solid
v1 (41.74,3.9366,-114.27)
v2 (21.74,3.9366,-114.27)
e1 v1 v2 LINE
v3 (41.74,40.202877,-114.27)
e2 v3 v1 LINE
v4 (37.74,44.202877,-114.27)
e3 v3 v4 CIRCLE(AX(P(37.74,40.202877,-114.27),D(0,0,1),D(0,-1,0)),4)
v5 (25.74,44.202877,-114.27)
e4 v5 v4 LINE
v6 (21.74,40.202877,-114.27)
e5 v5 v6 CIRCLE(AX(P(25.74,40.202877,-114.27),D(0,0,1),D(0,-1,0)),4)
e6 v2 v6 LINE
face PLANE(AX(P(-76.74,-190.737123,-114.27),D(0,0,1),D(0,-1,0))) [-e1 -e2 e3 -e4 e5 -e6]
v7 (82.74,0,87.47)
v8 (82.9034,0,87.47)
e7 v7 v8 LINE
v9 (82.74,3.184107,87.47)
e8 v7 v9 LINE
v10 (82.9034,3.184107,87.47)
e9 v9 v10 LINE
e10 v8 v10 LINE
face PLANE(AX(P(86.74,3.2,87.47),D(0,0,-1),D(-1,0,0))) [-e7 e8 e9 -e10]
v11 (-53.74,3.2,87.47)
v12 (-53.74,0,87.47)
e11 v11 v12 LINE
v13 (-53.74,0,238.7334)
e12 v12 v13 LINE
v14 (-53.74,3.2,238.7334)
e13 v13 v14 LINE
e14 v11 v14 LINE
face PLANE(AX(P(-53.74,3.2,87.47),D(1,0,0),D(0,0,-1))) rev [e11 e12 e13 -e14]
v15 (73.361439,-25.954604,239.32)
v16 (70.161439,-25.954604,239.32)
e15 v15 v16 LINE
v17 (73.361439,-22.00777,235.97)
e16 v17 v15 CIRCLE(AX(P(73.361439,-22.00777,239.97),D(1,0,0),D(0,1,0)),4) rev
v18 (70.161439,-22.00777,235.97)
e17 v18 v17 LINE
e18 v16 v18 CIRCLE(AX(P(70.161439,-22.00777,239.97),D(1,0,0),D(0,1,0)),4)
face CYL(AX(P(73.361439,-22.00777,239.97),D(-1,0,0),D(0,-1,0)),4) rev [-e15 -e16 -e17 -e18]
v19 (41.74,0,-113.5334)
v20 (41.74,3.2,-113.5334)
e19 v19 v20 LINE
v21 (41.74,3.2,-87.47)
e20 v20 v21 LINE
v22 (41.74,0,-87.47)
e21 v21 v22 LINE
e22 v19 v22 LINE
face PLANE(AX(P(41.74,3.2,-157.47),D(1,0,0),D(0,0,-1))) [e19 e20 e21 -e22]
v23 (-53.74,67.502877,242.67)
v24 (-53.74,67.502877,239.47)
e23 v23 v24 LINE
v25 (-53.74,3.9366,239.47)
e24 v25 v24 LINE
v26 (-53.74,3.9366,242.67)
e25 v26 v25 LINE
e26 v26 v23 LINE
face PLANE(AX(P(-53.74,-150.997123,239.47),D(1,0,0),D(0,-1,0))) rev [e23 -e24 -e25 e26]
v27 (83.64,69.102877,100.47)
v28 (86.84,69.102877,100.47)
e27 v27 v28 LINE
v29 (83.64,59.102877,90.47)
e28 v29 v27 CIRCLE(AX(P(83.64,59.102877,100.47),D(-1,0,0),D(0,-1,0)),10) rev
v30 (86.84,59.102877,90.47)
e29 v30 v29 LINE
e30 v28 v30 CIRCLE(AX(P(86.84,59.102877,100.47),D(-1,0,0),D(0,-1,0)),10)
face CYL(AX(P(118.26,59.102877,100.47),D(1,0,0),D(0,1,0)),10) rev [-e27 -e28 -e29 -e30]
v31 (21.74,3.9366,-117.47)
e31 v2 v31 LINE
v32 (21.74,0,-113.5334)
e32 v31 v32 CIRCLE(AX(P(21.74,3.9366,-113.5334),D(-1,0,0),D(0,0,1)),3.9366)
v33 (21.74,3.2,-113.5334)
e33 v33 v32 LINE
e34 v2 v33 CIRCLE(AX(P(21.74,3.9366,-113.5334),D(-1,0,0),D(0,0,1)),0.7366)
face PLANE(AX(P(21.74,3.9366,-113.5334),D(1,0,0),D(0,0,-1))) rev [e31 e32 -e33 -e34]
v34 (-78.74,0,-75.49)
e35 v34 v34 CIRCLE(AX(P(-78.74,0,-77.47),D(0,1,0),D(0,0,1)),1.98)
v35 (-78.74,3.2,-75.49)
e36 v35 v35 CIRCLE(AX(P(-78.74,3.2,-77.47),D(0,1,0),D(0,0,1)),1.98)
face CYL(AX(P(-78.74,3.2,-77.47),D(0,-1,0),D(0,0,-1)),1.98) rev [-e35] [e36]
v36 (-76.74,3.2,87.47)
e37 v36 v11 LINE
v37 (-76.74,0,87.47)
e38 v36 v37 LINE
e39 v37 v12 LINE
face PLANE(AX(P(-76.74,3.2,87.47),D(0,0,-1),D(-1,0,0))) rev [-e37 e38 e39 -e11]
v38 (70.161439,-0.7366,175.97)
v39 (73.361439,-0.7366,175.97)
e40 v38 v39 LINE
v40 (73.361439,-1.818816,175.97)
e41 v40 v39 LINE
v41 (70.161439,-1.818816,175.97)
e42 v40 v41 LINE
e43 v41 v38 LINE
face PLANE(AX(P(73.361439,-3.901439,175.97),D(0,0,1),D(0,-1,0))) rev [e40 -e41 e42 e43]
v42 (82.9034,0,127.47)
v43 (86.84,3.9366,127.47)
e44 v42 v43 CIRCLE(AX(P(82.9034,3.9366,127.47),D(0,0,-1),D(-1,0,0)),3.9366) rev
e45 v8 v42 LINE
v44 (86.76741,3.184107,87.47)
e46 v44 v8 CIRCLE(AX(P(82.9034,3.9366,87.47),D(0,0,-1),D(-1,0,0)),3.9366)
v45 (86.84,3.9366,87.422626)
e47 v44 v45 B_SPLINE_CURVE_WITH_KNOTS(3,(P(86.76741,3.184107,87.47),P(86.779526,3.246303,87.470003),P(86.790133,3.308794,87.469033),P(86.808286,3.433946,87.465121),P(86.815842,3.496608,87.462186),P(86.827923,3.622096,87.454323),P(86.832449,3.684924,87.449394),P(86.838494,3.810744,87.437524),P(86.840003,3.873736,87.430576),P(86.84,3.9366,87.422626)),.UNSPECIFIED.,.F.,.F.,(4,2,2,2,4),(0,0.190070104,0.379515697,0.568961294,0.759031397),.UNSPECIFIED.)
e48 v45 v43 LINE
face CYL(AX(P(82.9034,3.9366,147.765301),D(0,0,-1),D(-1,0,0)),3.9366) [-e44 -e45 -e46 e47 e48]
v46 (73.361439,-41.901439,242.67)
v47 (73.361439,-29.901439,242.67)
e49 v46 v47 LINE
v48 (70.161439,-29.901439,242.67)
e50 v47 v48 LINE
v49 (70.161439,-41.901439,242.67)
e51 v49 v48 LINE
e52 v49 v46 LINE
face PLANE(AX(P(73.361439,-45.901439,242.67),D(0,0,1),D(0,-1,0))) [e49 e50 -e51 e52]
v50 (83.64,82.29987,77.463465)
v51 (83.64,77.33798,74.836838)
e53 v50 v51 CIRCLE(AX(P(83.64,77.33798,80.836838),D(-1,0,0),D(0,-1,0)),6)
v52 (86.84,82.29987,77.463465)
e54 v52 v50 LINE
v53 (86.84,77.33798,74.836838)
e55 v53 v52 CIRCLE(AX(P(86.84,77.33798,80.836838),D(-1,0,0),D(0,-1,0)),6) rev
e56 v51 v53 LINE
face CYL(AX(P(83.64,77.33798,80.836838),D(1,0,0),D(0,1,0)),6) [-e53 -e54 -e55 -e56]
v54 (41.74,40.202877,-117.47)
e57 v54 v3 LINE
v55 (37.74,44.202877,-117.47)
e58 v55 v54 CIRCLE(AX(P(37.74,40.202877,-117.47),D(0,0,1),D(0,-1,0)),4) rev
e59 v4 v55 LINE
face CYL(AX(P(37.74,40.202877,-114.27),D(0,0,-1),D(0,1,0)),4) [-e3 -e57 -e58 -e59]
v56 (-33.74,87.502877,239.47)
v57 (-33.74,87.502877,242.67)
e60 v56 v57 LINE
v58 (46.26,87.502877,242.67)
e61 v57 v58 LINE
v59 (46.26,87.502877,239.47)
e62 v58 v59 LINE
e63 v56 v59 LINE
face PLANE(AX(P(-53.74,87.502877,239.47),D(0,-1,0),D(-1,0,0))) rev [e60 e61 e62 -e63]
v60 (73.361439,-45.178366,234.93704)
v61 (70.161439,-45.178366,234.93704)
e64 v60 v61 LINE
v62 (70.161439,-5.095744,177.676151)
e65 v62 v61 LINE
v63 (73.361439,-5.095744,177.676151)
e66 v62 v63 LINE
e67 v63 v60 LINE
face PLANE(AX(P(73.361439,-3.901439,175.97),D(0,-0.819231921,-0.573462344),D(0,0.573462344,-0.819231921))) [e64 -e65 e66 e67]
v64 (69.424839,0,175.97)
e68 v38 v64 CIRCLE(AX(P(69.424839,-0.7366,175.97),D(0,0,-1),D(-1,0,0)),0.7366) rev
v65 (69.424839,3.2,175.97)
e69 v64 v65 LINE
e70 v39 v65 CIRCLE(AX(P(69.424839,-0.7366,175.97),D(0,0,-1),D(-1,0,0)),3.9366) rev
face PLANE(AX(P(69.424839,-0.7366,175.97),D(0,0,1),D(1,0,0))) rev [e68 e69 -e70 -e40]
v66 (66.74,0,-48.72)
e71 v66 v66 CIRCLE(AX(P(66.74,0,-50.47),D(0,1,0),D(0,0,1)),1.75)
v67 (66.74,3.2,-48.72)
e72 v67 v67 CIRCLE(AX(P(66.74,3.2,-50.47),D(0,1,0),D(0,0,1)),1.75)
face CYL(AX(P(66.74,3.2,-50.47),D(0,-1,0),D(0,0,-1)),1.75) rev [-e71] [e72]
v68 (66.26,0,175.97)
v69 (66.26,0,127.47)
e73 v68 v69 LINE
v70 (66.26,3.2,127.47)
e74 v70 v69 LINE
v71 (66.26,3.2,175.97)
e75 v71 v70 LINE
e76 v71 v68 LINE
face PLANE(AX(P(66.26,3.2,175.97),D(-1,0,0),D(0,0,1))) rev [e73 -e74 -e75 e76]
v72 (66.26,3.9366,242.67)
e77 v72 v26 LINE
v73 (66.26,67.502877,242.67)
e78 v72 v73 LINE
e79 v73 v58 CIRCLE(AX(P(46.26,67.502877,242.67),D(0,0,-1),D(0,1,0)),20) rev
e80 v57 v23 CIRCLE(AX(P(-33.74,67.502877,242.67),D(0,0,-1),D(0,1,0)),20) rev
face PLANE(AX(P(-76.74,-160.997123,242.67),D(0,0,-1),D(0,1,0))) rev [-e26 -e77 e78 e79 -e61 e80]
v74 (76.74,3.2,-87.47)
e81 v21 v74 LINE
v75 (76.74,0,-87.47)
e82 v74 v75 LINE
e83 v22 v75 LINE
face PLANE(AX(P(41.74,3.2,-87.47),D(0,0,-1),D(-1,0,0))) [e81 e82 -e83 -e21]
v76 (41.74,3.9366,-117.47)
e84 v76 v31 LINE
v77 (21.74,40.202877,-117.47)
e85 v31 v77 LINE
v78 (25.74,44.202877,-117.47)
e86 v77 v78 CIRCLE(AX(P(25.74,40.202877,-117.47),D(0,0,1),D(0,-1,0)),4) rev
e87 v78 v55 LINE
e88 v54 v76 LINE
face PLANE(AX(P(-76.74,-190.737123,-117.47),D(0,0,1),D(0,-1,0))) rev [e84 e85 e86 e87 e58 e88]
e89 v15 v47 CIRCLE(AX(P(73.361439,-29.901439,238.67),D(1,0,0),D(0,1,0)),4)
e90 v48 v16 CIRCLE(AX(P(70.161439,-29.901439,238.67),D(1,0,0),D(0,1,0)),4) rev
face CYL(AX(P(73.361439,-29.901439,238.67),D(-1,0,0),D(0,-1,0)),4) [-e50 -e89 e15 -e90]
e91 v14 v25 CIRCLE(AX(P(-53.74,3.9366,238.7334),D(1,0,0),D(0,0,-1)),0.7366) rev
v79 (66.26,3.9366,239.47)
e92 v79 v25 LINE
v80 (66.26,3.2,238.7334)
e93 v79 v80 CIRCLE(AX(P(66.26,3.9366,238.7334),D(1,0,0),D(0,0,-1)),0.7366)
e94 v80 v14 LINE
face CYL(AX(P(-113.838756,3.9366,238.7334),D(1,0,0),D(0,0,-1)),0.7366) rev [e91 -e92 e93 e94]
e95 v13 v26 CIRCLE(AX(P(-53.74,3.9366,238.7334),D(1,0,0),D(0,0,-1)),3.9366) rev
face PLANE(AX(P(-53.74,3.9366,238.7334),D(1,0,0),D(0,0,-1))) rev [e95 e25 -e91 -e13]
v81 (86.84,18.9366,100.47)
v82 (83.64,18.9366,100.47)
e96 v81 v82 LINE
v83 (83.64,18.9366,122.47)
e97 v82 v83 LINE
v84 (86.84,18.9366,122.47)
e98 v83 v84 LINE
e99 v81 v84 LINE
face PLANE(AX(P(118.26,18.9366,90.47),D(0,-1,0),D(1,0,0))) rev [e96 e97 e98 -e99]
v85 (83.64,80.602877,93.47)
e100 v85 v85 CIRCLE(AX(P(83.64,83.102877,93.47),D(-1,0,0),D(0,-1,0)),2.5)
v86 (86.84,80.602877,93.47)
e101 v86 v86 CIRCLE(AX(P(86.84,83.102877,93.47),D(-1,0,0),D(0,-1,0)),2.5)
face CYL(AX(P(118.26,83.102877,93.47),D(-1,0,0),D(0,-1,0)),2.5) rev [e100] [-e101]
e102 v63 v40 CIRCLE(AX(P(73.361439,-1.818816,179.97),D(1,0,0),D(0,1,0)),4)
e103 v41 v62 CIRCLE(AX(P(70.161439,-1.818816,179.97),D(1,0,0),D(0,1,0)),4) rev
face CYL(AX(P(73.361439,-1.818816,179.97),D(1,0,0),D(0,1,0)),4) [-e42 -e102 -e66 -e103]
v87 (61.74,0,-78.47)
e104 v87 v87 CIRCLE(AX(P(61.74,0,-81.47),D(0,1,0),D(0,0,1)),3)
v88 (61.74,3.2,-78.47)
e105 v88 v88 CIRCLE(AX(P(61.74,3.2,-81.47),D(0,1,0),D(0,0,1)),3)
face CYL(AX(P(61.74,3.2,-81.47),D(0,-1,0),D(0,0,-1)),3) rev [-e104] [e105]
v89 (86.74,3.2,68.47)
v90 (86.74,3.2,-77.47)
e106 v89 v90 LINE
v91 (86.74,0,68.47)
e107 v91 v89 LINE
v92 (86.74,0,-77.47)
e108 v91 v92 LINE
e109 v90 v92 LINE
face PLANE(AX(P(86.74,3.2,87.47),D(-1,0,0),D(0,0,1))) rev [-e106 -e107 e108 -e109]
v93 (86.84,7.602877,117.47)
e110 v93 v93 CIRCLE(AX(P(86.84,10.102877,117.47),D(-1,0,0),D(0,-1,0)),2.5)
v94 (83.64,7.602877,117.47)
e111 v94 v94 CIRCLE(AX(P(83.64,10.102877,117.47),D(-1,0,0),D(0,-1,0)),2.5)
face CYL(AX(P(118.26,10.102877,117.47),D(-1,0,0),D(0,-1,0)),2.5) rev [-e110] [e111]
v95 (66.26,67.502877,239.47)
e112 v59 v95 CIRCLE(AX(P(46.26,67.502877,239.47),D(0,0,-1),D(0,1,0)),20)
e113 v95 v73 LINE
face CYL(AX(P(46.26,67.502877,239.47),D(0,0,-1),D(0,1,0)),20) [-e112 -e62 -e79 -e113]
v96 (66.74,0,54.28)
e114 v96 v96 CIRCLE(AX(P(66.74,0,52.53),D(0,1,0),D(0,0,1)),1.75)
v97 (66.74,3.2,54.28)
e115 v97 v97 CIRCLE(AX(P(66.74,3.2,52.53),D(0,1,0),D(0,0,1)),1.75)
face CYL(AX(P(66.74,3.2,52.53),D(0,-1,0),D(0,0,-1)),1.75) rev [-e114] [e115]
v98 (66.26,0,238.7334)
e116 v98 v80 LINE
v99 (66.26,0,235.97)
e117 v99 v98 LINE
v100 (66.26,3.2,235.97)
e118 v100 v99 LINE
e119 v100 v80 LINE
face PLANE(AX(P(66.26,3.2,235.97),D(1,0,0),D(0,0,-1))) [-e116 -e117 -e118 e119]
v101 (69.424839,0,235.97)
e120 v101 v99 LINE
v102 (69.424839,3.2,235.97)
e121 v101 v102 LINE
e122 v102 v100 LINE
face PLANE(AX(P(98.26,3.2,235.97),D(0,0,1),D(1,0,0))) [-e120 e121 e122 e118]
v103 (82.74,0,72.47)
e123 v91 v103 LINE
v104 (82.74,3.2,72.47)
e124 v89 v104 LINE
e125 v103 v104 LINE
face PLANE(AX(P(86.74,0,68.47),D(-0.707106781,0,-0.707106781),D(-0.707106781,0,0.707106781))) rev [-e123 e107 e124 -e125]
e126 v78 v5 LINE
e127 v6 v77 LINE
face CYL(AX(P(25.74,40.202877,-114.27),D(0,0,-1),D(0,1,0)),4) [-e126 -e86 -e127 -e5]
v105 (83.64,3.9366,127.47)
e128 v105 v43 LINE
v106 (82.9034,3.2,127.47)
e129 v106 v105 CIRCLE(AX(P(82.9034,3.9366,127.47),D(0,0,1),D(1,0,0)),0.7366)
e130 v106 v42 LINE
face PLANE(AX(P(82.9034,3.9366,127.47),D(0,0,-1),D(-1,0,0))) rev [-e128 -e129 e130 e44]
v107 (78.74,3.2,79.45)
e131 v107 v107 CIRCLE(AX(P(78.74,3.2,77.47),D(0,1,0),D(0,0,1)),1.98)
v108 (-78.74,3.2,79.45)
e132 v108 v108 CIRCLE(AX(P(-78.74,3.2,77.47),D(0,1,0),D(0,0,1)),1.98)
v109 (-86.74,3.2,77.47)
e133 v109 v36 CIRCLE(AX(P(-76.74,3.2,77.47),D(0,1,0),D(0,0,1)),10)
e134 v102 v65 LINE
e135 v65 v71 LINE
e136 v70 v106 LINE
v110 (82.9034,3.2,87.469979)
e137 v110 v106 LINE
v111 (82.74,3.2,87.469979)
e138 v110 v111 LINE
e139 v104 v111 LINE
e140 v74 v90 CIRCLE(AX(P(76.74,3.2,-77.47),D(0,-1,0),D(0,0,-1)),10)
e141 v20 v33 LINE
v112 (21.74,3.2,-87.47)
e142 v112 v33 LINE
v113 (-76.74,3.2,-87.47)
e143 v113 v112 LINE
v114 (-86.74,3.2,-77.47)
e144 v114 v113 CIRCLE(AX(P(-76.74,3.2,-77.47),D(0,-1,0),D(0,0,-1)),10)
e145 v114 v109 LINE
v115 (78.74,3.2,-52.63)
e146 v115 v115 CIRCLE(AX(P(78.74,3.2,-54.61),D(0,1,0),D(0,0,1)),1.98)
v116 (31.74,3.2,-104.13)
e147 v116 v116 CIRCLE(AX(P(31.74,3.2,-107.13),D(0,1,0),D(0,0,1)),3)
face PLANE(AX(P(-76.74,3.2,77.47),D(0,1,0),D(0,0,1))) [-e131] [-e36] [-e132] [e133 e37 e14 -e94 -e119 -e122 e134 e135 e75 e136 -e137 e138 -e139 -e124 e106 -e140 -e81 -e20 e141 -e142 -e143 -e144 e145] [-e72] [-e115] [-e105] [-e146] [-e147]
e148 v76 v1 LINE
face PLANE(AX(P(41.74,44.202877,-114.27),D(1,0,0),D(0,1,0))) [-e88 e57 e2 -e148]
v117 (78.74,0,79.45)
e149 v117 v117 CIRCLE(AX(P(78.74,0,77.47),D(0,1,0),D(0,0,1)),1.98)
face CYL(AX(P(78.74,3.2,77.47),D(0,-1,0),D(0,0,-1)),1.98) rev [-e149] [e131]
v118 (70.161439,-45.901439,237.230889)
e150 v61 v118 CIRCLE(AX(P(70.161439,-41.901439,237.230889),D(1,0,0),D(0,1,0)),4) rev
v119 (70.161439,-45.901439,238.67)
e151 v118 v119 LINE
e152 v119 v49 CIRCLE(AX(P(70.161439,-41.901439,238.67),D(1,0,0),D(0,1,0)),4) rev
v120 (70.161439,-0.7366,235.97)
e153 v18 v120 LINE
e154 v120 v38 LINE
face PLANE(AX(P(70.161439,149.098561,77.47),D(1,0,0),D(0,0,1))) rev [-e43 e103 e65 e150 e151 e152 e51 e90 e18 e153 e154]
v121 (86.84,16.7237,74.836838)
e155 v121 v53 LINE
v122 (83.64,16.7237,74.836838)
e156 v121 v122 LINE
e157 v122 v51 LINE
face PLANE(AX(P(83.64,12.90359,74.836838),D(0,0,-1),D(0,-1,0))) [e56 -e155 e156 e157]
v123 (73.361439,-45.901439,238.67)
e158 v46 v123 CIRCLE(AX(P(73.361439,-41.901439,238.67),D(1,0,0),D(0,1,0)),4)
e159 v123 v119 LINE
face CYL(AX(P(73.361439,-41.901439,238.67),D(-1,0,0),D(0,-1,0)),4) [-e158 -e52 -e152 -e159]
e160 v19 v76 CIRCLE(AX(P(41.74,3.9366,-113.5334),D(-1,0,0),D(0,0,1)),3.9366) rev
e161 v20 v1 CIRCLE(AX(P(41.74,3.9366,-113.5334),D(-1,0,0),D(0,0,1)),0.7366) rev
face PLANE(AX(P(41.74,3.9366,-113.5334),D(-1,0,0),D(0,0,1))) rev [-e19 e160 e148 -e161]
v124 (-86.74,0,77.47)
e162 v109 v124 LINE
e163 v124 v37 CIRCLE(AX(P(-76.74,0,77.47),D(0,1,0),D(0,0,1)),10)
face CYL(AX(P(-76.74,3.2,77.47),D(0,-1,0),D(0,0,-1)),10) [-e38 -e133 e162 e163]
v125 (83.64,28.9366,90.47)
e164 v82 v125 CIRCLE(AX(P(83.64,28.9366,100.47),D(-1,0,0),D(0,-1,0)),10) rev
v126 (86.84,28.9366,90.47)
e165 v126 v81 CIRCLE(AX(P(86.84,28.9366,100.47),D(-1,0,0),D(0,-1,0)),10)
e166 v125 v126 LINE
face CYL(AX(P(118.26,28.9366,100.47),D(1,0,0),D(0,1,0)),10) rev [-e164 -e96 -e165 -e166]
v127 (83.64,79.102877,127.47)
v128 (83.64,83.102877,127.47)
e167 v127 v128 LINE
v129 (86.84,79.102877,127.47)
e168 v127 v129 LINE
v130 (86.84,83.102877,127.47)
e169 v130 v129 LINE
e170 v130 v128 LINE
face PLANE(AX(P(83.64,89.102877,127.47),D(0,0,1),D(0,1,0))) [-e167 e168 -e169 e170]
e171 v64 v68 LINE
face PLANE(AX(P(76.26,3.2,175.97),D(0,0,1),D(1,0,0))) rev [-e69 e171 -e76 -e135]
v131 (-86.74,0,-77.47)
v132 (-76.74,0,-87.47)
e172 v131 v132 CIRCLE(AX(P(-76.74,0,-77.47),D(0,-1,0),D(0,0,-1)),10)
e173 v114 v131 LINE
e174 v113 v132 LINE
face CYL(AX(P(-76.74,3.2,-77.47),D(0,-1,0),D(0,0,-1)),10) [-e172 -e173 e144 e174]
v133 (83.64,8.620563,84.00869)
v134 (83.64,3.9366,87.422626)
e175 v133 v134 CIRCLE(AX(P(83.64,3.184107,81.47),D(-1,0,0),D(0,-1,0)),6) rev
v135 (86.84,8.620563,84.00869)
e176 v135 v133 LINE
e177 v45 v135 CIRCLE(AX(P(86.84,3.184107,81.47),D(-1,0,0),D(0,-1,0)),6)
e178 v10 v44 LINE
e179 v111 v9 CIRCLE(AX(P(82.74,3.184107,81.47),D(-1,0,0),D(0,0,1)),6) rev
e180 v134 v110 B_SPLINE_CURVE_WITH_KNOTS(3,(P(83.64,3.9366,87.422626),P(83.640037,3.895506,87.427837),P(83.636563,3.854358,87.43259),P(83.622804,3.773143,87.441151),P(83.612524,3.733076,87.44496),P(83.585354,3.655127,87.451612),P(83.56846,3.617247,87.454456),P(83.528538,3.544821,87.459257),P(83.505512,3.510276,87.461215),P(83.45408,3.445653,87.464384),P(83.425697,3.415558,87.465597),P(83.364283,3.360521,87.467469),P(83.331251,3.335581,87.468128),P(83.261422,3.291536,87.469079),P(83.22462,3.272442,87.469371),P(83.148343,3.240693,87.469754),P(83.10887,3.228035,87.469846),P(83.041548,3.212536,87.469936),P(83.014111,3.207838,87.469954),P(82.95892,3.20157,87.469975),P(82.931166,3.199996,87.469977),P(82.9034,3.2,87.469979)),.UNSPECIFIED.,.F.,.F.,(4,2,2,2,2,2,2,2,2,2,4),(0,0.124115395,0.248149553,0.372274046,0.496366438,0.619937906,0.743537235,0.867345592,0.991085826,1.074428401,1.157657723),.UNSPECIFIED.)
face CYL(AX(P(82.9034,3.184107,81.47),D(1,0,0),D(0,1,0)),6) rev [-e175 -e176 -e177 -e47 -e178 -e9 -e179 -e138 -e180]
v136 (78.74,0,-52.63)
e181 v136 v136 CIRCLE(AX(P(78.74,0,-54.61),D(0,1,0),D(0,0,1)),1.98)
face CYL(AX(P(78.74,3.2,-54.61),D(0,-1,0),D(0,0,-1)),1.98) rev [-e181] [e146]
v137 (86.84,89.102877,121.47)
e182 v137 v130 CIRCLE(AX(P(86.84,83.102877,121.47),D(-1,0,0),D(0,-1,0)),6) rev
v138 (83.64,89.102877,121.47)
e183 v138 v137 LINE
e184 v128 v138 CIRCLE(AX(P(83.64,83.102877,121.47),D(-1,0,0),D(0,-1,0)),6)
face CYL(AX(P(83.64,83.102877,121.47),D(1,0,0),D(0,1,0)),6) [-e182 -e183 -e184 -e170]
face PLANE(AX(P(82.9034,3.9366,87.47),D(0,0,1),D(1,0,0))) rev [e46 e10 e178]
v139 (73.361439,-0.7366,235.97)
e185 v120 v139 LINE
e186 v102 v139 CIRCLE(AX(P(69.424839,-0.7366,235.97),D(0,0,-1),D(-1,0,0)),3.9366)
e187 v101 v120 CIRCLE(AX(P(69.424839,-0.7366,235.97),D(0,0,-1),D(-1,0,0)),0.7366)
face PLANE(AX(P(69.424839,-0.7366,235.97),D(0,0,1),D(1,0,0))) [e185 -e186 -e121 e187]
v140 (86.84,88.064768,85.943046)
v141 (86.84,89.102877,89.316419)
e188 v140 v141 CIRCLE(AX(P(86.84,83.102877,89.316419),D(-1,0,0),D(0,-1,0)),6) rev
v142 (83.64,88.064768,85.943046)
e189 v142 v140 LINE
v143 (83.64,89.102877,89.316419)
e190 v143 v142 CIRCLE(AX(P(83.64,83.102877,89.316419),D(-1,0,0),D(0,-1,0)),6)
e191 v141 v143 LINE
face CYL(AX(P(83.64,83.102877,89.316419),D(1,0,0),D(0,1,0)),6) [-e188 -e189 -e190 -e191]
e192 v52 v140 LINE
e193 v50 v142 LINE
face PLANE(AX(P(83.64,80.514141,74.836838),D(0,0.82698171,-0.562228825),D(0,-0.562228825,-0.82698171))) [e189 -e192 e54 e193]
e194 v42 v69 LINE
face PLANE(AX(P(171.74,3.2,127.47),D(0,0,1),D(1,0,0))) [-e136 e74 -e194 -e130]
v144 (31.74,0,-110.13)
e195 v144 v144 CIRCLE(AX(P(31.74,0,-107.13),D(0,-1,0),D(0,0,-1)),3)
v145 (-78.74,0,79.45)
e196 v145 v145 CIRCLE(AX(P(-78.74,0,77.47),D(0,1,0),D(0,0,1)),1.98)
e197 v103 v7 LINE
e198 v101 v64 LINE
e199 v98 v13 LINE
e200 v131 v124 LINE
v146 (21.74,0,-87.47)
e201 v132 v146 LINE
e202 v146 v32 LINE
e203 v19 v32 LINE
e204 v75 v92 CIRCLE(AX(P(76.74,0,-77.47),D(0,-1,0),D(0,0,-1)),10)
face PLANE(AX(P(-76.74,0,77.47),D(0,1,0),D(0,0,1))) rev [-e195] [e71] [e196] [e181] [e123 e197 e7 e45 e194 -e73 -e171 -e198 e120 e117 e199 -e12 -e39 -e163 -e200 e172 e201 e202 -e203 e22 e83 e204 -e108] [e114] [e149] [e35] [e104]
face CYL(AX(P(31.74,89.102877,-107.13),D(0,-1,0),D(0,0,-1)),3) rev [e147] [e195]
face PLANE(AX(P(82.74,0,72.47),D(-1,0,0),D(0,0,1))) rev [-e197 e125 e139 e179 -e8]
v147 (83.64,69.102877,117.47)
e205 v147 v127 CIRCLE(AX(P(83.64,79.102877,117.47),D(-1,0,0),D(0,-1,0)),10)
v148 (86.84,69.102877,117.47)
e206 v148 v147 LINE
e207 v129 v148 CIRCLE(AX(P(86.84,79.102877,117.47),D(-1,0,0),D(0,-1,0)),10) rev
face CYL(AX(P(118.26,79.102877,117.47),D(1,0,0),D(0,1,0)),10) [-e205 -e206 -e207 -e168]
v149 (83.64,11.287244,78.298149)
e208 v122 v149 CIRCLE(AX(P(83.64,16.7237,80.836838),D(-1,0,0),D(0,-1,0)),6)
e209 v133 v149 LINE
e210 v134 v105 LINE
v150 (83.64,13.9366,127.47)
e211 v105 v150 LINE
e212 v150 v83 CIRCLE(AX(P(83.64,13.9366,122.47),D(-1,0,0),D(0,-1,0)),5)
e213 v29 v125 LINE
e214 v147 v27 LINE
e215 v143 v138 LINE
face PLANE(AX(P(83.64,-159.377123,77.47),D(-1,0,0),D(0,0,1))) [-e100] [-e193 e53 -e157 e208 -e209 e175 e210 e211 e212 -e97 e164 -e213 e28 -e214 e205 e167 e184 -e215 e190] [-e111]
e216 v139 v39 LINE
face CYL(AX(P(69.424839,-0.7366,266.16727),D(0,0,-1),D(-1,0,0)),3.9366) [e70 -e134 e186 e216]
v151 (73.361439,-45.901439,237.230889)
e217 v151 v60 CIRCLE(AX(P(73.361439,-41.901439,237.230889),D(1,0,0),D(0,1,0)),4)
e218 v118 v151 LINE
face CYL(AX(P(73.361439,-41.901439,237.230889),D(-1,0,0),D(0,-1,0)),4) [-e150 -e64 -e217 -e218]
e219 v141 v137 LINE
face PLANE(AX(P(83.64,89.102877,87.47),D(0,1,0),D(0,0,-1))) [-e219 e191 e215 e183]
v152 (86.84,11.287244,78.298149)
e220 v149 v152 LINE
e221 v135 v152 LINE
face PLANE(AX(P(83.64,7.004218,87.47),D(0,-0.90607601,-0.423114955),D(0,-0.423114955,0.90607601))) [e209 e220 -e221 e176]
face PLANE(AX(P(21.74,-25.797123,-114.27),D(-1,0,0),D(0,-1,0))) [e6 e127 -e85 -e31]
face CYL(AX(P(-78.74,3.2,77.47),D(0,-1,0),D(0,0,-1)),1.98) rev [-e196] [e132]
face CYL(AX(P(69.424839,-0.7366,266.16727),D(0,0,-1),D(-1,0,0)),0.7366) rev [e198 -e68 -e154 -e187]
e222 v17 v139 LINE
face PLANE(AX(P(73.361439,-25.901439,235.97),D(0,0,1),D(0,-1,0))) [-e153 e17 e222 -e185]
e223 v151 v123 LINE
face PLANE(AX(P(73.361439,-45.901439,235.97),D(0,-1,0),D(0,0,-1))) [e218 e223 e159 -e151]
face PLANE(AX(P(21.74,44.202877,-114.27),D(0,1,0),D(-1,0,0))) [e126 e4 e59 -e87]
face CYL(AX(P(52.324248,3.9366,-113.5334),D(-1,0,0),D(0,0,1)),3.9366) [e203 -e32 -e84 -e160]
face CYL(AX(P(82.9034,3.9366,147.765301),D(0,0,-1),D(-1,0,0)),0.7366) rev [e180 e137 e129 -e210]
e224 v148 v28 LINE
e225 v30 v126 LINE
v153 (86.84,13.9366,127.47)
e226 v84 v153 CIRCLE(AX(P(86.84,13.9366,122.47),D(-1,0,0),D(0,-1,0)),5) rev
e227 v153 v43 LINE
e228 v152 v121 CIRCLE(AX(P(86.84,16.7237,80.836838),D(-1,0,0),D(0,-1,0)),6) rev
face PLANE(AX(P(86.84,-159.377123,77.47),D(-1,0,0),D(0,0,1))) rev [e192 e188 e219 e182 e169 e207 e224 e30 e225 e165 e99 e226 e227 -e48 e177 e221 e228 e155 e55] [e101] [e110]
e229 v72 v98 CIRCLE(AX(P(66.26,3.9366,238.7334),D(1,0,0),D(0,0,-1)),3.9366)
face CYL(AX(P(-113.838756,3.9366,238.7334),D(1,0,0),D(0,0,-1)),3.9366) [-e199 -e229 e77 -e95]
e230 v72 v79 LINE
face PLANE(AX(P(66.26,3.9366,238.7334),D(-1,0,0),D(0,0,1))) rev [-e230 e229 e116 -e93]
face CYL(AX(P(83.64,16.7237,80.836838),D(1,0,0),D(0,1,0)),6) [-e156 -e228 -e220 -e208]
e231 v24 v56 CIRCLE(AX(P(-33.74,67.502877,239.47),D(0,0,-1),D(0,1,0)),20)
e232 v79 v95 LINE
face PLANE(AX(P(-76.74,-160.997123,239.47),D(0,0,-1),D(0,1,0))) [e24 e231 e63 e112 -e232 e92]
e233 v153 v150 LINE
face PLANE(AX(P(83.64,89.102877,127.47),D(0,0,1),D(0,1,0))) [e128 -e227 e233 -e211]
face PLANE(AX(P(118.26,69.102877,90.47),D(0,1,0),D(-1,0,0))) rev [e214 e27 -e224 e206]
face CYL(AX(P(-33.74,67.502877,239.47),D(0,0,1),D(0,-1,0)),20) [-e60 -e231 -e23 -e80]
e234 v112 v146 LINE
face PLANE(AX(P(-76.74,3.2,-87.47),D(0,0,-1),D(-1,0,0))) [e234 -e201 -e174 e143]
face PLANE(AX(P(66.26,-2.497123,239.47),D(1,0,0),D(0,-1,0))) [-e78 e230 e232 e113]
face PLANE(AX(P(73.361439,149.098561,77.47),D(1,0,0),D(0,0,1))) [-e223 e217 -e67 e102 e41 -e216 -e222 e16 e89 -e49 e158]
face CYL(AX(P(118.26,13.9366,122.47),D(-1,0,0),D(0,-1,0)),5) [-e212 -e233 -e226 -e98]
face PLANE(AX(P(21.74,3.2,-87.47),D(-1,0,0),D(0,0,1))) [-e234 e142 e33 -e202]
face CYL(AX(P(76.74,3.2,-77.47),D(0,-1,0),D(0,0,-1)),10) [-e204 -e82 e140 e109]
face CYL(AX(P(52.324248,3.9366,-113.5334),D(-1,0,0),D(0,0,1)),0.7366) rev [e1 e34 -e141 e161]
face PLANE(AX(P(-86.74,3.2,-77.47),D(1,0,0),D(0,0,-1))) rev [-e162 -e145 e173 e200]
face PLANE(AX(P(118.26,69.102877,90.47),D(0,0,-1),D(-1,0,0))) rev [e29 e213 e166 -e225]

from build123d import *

# Parameters (mm, degrees)
SKETCH1_R                  = 1.98
SKETCH1_R_2                = 3
SKETCH1_R_3                = 1.75
BASE_FLANGE1_DEPTH         = 3.2
CUT_EXTRUDE1_DEPTH         = 369.458014569
SKETCHED_START             = 74.836838233
SKETCHED_BEND1_DEPTH       = 52.633161767
SKETCHED_START_2           = 87.47
SKETCHED_BEND1_2_DEPTH     = 40
SKETCHED_START_3           = 83.64
SKETCHED_BEND1_3_DEPTH     = 3.2
SKETCH9_R                  = 2.5
CUT_EXTRUDE2_DEPTH         = 379.450932148
FILLET1_R                  = 6
SKETCH10_W                 = 60
SKETCH10_H                 = 50.166277303
CUT_EXTRUDE3_DEPTH         = 379.450932148
FILLET2_R                  = 10
SKETCHED_START_4           = 21.74
SKETCHED_BEND2_DEPTH       = 20
SKETCHED_BEND2_2_DEPTH     = 20
FILLET3_R                  = 5
SKETCH13_R                 = 3
CUT_EXTRUDE4_DEPTH         = 359.024009312
SKETCHED_START_5           = -53.74
SKETCHED_BEND3_DEPTH       = 120
SKETCHED_BEND3_2_DEPTH     = 120
FILLET4_R                  = 20
SKETCHED_START_6           = 175.97
SKETCHED_BEND5_DEPTH       = 66.7
SKETCHED_START_7           = 208.025657316
SKETCHED_BEND5_2_DEPTH     = 27.944342684
SKETCHED_START_8           = 235.97
SKETCHED_BEND5_3_OUTLINE_W = 3.2
SKETCHED_BEND5_3_OUTLINE_H = 20
SKETCHED_BEND5_3_DEPTH     = 6.7
SKETCHED_BEND5_4_DEPTH     = 32.055657316
SKETCHED_START_9           = 70.161438651
SKETCHED_BEND5_5_DEPTH     = 3.2
SKETCHED_BEND5_6_DEPTH     = 3.2
FILLET5_R                  = 4
FILLET6_R                  = 4
FILLET7_R                  = 4


with BuildPart() as part:
    # Base-Flange1: sheet metal written as solids
    # Sketch1 → Base-Flange1 (new body)
    with BuildSketch(Plane(origin=(0, 0, 0), x_dir=(1, 0, 0), z_dir=(0, 1, 0))):
        with BuildLine():
            Line((-86.74, 77.47), (-86.74, -77.47))
            ThreePointArc((-86.74, -77.47), (-83.811067812, -84.541067812), (-76.74, -87.47))
            Line((-76.74, -87.47), (-53.74, -87.47))
            Line((-53.74, -87.47), (-53.74, -325.97))
            Line((-53.74, -325.97), (66.26, -325.97))
            Line((66.26, -325.97), (66.26, -235.97))
            Line((66.26, -235.97), (98.26, -235.97))
            Line((98.26, -235.97), (98.26, -242.67))
            Line((98.26, -242.67), (118.26, -242.67))
            Line((118.26, -242.67), (118.26, -235.97))
            Line((118.26, -235.97), (76.26, -175.97))
            Line((76.26, -175.97), (66.26, -175.97))
            Line((66.26, -175.97), (66.26, -127.47))
            Line((66.26, -127.47), (86.74, -127.47))
            Line((86.74, -127.47), (171.74, -127.47))
            Line((171.74, -127.47), (171.74, -87.47))
            Line((171.74, -87.47), (163.151263871, -74.836838233))
            Line((163.151263871, -74.836838233), (95.540712582, -74.836838233))
            Line((95.540712582, -74.836838233), (89.641340328, -87.47))
            Line((89.641340328, -87.47), (86.74, -87.47))
            Line((86.74, -87.47), (86.74, 77.47))
            ThreePointArc((86.74, 77.47), (83.811067812, 84.541067812), (76.74, 87.47))
            Line((76.74, 87.47), (41.74, 87.47))
            Line((41.74, 87.47), (41.74, 157.47))
            Line((41.74, 157.47), (21.74, 157.47))
            Line((21.74, 157.47), (21.74, 87.47))
            Line((21.74, 87.47), (-76.74, 87.47))
            ThreePointArc((-76.74, 87.47), (-83.811067812, 84.541067812), (-86.74, 77.47))
        make_face()
        with Locations(Location((-78.74, 77.47, 0), (0, 0, 270))):
            Circle(SKETCH1_R, mode=Mode.SUBTRACT)
        with Locations(Location((-78.74, -77.47, 0), (0, 0, 270))):
            Circle(SKETCH1_R, mode=Mode.SUBTRACT)
        with Locations(Location((78.74, -77.47, 0), (0, 0, 270))):
            Circle(SKETCH1_R, mode=Mode.SUBTRACT)
        with Locations(Location((78.74, 54.61, 0), (0, 0, 270))):
            Circle(SKETCH1_R, mode=Mode.SUBTRACT)
        with Locations(Location((61.74, 81.47, 0), (0, 0, 270))):
            Circle(SKETCH1_R_2, mode=Mode.SUBTRACT)
        with Locations(Location((66.74, 50.47, 0), (0, 0, 270))):
            Circle(SKETCH1_R_3, mode=Mode.SUBTRACT)
        with Locations(Location((66.74, -52.53, 0), (0, 0, 270))):
            Circle(SKETCH1_R_3, mode=Mode.SUBTRACT)
    extrude(amount=BASE_FLANGE1_DEPTH)

    # Sketch6 → Cut-Extrude1 (cut, through all)
    with BuildSketch(Plane(origin=(0, 3.2, 0), x_dir=(1, 0, 0), z_dir=(0, 1, 0))):
        Polygon((86.74, -68.47), (82.74, -72.47), (82.74, -87.47), (86.74, -87.47), align=None)
    extrude(amount=-CUT_EXTRUDE1_DEPTH, mode=Mode.SUBTRACT)

    # Sketched Bend1: read off the stored shape, not the designer's step
    # Sketched Bend1 outline → Sketched Bend1 (cut)
    with BuildSketch(Plane.XY.offset(SKETCHED_START)):
        with BuildLine():
            Line((171.74, 3.2), (86.770471243, 3.2))
            ThreePointArc((86.770471243, 3.2), (85.413093209, 0.903736739), (82.9034, 0))
            Line((82.9034, 0), (171.74, 0))
            Line((171.74, 0), (171.74, 3.2))
        make_face()
    extrude(amount=SKETCHED_BEND1_DEPTH, mode=Mode.SUBTRACT)

    # Sketched Bend1 2 outline → Sketched Bend1 2 (add)
    with BuildSketch(Plane.XY.offset(SKETCHED_START_2)):
        with BuildLine():
            Line((86.84, 89.102877303), (83.64, 89.102877303))
            Line((83.64, 89.102877303), (83.64, 3.9366))
            ThreePointArc((83.64, 3.9366), (83.424254855, 3.415745145), (82.9034, 3.2))
            Line((82.9034, 3.2), (86.770471243, 3.2))
            ThreePointArc((86.770471243, 3.2), (86.822579265, 3.566662908), (86.84, 3.9366))
            Line((86.84, 3.9366), (86.84, 89.102877303))
        make_face()
    extrude(amount=SKETCHED_BEND1_2_DEPTH)

    # Sketched Bend1 3 outline → Sketched Bend1 3 (add)
    with BuildSketch(Plane.YZ.offset(SKETCHED_START_3)):
        Polygon((12.903589884, 74.836838233), (80.514141174, 74.836838233), (89.102877303, 87.47), (7.004217631, 87.47), align=None)
    extrude(amount=SKETCHED_BEND1_3_DEPTH)

    # Sketch9 → Cut-Extrude2 (cut, through all)
    with BuildSketch(Plane.ZY.offset(-83.64)):
        with Locations(Location((93.47, 83.102877303, 0), (0, 0, 270))):
            Circle(SKETCH9_R)
        with Locations(Location((117.47, 10.102877303, 0), (0, 0, 270))):
            Circle(SKETCH9_R)
    extrude(amount=-CUT_EXTRUDE2_DEPTH, mode=Mode.SUBTRACT)

    # Fillet1
    fillet1_edges = [part.edges().sort_by_distance(p)[0] for p in [
        (85.24, 7.004217631, 87.47),
        (85.24, 12.903589884, 74.836838233),
        (85.24, 80.514141174, 74.836838233),
        (85.24, 89.102877303, 87.47),
        (85.24, 89.102877303, 127.47),
    ]]
    fillet(fillet1_edges, radius=FILLET1_R)

    # Sketch10 → Cut-Extrude3 (cut, through all)
    with BuildSketch(Plane.ZY.offset(-83.64)):
        with Locations((120.47, 44.019738651)):
            Rectangle(SKETCH10_W, SKETCH10_H)
    extrude(amount=-CUT_EXTRUDE3_DEPTH, mode=Mode.SUBTRACT)

    # Fillet2
    fillet2_edges = [part.edges().sort_by_distance(p)[0] for p in [
        (85.24, 18.9366, 90.47),
        (85.24, 69.102877303, 127.47),
        (85.24, 69.102877303, 90.47),
    ]]
    fillet(fillet2_edges, radius=FILLET2_R)

    # Sketched Bend2: read off the stored shape, not the designer's step
    # Sketched Bend2 outline → Sketched Bend2 (cut)
    with BuildSketch(Plane.YZ.offset(SKETCHED_START_4)):
        with BuildLine():
            Line((3.2, -157.47), (3.2, -117.400471243))
            ThreePointArc((3.2, -117.400471243), (0.903736739, -116.043093209), (0, -113.5334))
            Line((0, -113.5334), (0, -157.47))
            Line((0, -157.47), (3.2, -157.47))
        make_face()
    extrude(amount=SKETCHED_BEND2_DEPTH, mode=Mode.SUBTRACT)

    # Sketched Bend2 2 outline → Sketched Bend2 2 (add)
    with BuildSketch(Plane.YZ.offset(SKETCHED_START_4)):
        with BuildLine():
            Line((44.202877303, -114.27), (3.9366, -114.27))
            ThreePointArc((3.9366, -114.27), (3.415745145, -114.054254855), (3.2, -113.5334))
            Line((3.2, -113.5334), (3.2, -117.400471243))
            ThreePointArc((3.2, -117.400471243), (3.566662908, -117.452579265), (3.9366, -117.47))
            Line((3.9366, -117.47), (44.202877303, -117.47))
            Line((44.202877303, -117.47), (44.202877303, -114.27))
        make_face()
    extrude(amount=SKETCHED_BEND2_2_DEPTH)

    # Fillet3
    fillet3_edges = [part.edges().sort_by_distance(p)[0] for p in [
        (85.24, 18.9366, 127.47),
    ]]
    fillet(fillet3_edges, radius=FILLET3_R)

    # Sketch13 → Cut-Extrude4 (cut, through all)
    with BuildSketch(Plane.XZ):
        with Locations(Location((31.74, -107.13, 0), (0, 0, 270))):
            Circle(SKETCH13_R)
    extrude(amount=-CUT_EXTRUDE4_DEPTH, mode=Mode.SUBTRACT)

    # Sketched Bend3: read off the stored shape, not the designer's step
    # Sketched Bend3 outline → Sketched Bend3 (cut)
    with BuildSketch(Plane.YZ.offset(SKETCHED_START_5)):
        with BuildLine():
            ThreePointArc((0, 238.7334), (0.903736739, 241.243093209), (3.2, 242.600471243))
            Line((3.2, 242.600471243), (3.2, 325.97))
            Line((3.2, 325.97), (0, 325.97))
            Line((0, 325.97), (0, 238.7334))
        make_face()
    extrude(amount=SKETCHED_BEND3_DEPTH, mode=Mode.SUBTRACT)

    # Sketched Bend3 2 outline → Sketched Bend3 2 (add)
    with BuildSketch(Plane.YZ.offset(SKETCHED_START_5)):
        with BuildLine():
            Line((87.502877303, 242.67), (3.9366, 242.67))
            ThreePointArc((3.9366, 242.67), (3.566662908, 242.652579265), (3.2, 242.600471243))
            Line((3.2, 242.600471243), (3.2, 238.7334))
            ThreePointArc((3.2, 238.7334), (3.415745145, 239.254254855), (3.9366, 239.47))
            Line((3.9366, 239.47), (87.502877303, 239.47))
            Line((87.502877303, 239.47), (87.502877303, 242.67))
        make_face()
    extrude(amount=SKETCHED_BEND3_2_DEPTH)

    # Fillet4
    fillet4_edges = [part.edges().sort_by_distance(p)[0] for p in [
        (-53.74, 87.502877303, 241.07),
        (66.26, 87.502877303, 241.07),
    ]]
    fillet(fillet4_edges, radius=FILLET4_R)

    # Sketched Bend5: read off the stored shape, not the designer's step
    # Sketched Bend5 outline → Sketched Bend5 (cut)
    with BuildSketch(Plane.XY.offset(SKETCHED_START_6)):
        with BuildLine():
            ThreePointArc((69.424838651, 3.2), (71.93453186, 2.296263261), (73.291909894, 0))
            Line((73.291909894, 0), (118.26, 0))
            Line((118.26, 0), (118.26, 3.2))
            Line((118.26, 3.2), (69.424838651, 3.2))
        make_face()
    extrude(amount=SKETCHED_BEND5_DEPTH, mode=Mode.SUBTRACT)

    # Sketched Bend5 2 outline → Sketched Bend5 2 (add)
    with BuildSketch(Plane.XY.offset(SKETCHED_START_7)):
        with BuildLine():
            ThreePointArc((73.361438651, -0.7366), (73.344017916, -0.366662908), (73.291909894, 0))
            Line((73.291909894, 0), (69.424838651, 0))
            ThreePointArc((69.424838651, 0), (69.945693506, -0.215745145), (70.161438651, -0.7366))
            Line((70.161438651, -0.7366), (70.161438651, -25.901438651))
            Line((70.161438651, -25.901438651), (73.361438651, -25.901438651))
            Line((73.361438651, -25.901438651), (73.361438651, -0.7366))
        make_face()
    extrude(amount=SKETCHED_BEND5_2_DEPTH)

    # Sketched Bend5 3 outline → Sketched Bend5 3 (add)
    with BuildSketch(Plane.XY.offset(SKETCHED_START_8)):
        with Locations((71.761438651, -35.901438651)):
            Rectangle(SKETCHED_BEND5_3_OUTLINE_W, SKETCHED_BEND5_3_OUTLINE_H)
    extrude(amount=SKETCHED_BEND5_3_DEPTH)

    # Sketched Bend5 4 outline → Sketched Bend5 4 (add)
    with BuildSketch(Plane.XY.offset(SKETCHED_START_6)):
        with BuildLine():
            ThreePointArc((73.361438651, -0.7366), (73.344017916, -0.366662908), (73.291909894, 0))
            Line((73.291909894, 0), (69.424838651, 0))
            ThreePointArc((69.424838651, 0), (69.945693506, -0.215745145), (70.161438651, -0.7366))
            Line((70.161438651, -0.7366), (70.161438651, -25.901438651))
            Line((70.161438651, -25.901438651), (73.361438651, -25.901438651))
            Line((73.361438651, -25.901438651), (73.361438651, -0.7366))
        make_face()
    extrude(amount=SKETCHED_BEND5_4_DEPTH)

    # Sketched Bend5 5 outline → Sketched Bend5 5 (cut)
    with BuildSketch(Plane.YZ.offset(SKETCHED_START_9)):
        Polygon((-3.901438651, 175.97), (-25.901438651, 207.398571429), (-25.901438651, 175.97), align=None)
    extrude(amount=SKETCHED_BEND5_5_DEPTH, mode=Mode.SUBTRACT)

    # Sketched Bend5 6 outline → Sketched Bend5 6 (add)
    with BuildSketch(Plane.YZ.offset(SKETCHED_START_9)):
        Polygon((-25.901438651, 235.97), (-45.901438651, 235.97), (-25.901438651, 207.398571429), align=None)
    extrude(amount=SKETCHED_BEND5_6_DEPTH)

    # Fillet5
    fillet5_edges = [part.edges().sort_by_distance(p)[0] for p in [
        (41.74, 44.202877303, -115.87),
        (21.74, 44.202877303, -115.87),
    ]]
    fillet(fillet5_edges, radius=FILLET5_R)

    # Fillet6
    fillet6_edges = [part.edges().sort_by_distance(p)[0] for p in [
        (71.761438651, -45.901438651, 235.97),
        (71.761438651, -45.901438651, 242.67),
        (71.761438651, -25.901438651, 242.67),
        (71.761438651, -3.901438651, 175.97),
    ]]
    fillet(fillet6_edges, radius=FILLET6_R)

    # Fillet7
    fillet7_edges = [part.edges().sort_by_distance(p)[0] for p in [
        (71.761438651, -25.901438651, 235.97),
    ]]
    fillet(fillet7_edges, radius=FILLET7_R)


solid = part.part
